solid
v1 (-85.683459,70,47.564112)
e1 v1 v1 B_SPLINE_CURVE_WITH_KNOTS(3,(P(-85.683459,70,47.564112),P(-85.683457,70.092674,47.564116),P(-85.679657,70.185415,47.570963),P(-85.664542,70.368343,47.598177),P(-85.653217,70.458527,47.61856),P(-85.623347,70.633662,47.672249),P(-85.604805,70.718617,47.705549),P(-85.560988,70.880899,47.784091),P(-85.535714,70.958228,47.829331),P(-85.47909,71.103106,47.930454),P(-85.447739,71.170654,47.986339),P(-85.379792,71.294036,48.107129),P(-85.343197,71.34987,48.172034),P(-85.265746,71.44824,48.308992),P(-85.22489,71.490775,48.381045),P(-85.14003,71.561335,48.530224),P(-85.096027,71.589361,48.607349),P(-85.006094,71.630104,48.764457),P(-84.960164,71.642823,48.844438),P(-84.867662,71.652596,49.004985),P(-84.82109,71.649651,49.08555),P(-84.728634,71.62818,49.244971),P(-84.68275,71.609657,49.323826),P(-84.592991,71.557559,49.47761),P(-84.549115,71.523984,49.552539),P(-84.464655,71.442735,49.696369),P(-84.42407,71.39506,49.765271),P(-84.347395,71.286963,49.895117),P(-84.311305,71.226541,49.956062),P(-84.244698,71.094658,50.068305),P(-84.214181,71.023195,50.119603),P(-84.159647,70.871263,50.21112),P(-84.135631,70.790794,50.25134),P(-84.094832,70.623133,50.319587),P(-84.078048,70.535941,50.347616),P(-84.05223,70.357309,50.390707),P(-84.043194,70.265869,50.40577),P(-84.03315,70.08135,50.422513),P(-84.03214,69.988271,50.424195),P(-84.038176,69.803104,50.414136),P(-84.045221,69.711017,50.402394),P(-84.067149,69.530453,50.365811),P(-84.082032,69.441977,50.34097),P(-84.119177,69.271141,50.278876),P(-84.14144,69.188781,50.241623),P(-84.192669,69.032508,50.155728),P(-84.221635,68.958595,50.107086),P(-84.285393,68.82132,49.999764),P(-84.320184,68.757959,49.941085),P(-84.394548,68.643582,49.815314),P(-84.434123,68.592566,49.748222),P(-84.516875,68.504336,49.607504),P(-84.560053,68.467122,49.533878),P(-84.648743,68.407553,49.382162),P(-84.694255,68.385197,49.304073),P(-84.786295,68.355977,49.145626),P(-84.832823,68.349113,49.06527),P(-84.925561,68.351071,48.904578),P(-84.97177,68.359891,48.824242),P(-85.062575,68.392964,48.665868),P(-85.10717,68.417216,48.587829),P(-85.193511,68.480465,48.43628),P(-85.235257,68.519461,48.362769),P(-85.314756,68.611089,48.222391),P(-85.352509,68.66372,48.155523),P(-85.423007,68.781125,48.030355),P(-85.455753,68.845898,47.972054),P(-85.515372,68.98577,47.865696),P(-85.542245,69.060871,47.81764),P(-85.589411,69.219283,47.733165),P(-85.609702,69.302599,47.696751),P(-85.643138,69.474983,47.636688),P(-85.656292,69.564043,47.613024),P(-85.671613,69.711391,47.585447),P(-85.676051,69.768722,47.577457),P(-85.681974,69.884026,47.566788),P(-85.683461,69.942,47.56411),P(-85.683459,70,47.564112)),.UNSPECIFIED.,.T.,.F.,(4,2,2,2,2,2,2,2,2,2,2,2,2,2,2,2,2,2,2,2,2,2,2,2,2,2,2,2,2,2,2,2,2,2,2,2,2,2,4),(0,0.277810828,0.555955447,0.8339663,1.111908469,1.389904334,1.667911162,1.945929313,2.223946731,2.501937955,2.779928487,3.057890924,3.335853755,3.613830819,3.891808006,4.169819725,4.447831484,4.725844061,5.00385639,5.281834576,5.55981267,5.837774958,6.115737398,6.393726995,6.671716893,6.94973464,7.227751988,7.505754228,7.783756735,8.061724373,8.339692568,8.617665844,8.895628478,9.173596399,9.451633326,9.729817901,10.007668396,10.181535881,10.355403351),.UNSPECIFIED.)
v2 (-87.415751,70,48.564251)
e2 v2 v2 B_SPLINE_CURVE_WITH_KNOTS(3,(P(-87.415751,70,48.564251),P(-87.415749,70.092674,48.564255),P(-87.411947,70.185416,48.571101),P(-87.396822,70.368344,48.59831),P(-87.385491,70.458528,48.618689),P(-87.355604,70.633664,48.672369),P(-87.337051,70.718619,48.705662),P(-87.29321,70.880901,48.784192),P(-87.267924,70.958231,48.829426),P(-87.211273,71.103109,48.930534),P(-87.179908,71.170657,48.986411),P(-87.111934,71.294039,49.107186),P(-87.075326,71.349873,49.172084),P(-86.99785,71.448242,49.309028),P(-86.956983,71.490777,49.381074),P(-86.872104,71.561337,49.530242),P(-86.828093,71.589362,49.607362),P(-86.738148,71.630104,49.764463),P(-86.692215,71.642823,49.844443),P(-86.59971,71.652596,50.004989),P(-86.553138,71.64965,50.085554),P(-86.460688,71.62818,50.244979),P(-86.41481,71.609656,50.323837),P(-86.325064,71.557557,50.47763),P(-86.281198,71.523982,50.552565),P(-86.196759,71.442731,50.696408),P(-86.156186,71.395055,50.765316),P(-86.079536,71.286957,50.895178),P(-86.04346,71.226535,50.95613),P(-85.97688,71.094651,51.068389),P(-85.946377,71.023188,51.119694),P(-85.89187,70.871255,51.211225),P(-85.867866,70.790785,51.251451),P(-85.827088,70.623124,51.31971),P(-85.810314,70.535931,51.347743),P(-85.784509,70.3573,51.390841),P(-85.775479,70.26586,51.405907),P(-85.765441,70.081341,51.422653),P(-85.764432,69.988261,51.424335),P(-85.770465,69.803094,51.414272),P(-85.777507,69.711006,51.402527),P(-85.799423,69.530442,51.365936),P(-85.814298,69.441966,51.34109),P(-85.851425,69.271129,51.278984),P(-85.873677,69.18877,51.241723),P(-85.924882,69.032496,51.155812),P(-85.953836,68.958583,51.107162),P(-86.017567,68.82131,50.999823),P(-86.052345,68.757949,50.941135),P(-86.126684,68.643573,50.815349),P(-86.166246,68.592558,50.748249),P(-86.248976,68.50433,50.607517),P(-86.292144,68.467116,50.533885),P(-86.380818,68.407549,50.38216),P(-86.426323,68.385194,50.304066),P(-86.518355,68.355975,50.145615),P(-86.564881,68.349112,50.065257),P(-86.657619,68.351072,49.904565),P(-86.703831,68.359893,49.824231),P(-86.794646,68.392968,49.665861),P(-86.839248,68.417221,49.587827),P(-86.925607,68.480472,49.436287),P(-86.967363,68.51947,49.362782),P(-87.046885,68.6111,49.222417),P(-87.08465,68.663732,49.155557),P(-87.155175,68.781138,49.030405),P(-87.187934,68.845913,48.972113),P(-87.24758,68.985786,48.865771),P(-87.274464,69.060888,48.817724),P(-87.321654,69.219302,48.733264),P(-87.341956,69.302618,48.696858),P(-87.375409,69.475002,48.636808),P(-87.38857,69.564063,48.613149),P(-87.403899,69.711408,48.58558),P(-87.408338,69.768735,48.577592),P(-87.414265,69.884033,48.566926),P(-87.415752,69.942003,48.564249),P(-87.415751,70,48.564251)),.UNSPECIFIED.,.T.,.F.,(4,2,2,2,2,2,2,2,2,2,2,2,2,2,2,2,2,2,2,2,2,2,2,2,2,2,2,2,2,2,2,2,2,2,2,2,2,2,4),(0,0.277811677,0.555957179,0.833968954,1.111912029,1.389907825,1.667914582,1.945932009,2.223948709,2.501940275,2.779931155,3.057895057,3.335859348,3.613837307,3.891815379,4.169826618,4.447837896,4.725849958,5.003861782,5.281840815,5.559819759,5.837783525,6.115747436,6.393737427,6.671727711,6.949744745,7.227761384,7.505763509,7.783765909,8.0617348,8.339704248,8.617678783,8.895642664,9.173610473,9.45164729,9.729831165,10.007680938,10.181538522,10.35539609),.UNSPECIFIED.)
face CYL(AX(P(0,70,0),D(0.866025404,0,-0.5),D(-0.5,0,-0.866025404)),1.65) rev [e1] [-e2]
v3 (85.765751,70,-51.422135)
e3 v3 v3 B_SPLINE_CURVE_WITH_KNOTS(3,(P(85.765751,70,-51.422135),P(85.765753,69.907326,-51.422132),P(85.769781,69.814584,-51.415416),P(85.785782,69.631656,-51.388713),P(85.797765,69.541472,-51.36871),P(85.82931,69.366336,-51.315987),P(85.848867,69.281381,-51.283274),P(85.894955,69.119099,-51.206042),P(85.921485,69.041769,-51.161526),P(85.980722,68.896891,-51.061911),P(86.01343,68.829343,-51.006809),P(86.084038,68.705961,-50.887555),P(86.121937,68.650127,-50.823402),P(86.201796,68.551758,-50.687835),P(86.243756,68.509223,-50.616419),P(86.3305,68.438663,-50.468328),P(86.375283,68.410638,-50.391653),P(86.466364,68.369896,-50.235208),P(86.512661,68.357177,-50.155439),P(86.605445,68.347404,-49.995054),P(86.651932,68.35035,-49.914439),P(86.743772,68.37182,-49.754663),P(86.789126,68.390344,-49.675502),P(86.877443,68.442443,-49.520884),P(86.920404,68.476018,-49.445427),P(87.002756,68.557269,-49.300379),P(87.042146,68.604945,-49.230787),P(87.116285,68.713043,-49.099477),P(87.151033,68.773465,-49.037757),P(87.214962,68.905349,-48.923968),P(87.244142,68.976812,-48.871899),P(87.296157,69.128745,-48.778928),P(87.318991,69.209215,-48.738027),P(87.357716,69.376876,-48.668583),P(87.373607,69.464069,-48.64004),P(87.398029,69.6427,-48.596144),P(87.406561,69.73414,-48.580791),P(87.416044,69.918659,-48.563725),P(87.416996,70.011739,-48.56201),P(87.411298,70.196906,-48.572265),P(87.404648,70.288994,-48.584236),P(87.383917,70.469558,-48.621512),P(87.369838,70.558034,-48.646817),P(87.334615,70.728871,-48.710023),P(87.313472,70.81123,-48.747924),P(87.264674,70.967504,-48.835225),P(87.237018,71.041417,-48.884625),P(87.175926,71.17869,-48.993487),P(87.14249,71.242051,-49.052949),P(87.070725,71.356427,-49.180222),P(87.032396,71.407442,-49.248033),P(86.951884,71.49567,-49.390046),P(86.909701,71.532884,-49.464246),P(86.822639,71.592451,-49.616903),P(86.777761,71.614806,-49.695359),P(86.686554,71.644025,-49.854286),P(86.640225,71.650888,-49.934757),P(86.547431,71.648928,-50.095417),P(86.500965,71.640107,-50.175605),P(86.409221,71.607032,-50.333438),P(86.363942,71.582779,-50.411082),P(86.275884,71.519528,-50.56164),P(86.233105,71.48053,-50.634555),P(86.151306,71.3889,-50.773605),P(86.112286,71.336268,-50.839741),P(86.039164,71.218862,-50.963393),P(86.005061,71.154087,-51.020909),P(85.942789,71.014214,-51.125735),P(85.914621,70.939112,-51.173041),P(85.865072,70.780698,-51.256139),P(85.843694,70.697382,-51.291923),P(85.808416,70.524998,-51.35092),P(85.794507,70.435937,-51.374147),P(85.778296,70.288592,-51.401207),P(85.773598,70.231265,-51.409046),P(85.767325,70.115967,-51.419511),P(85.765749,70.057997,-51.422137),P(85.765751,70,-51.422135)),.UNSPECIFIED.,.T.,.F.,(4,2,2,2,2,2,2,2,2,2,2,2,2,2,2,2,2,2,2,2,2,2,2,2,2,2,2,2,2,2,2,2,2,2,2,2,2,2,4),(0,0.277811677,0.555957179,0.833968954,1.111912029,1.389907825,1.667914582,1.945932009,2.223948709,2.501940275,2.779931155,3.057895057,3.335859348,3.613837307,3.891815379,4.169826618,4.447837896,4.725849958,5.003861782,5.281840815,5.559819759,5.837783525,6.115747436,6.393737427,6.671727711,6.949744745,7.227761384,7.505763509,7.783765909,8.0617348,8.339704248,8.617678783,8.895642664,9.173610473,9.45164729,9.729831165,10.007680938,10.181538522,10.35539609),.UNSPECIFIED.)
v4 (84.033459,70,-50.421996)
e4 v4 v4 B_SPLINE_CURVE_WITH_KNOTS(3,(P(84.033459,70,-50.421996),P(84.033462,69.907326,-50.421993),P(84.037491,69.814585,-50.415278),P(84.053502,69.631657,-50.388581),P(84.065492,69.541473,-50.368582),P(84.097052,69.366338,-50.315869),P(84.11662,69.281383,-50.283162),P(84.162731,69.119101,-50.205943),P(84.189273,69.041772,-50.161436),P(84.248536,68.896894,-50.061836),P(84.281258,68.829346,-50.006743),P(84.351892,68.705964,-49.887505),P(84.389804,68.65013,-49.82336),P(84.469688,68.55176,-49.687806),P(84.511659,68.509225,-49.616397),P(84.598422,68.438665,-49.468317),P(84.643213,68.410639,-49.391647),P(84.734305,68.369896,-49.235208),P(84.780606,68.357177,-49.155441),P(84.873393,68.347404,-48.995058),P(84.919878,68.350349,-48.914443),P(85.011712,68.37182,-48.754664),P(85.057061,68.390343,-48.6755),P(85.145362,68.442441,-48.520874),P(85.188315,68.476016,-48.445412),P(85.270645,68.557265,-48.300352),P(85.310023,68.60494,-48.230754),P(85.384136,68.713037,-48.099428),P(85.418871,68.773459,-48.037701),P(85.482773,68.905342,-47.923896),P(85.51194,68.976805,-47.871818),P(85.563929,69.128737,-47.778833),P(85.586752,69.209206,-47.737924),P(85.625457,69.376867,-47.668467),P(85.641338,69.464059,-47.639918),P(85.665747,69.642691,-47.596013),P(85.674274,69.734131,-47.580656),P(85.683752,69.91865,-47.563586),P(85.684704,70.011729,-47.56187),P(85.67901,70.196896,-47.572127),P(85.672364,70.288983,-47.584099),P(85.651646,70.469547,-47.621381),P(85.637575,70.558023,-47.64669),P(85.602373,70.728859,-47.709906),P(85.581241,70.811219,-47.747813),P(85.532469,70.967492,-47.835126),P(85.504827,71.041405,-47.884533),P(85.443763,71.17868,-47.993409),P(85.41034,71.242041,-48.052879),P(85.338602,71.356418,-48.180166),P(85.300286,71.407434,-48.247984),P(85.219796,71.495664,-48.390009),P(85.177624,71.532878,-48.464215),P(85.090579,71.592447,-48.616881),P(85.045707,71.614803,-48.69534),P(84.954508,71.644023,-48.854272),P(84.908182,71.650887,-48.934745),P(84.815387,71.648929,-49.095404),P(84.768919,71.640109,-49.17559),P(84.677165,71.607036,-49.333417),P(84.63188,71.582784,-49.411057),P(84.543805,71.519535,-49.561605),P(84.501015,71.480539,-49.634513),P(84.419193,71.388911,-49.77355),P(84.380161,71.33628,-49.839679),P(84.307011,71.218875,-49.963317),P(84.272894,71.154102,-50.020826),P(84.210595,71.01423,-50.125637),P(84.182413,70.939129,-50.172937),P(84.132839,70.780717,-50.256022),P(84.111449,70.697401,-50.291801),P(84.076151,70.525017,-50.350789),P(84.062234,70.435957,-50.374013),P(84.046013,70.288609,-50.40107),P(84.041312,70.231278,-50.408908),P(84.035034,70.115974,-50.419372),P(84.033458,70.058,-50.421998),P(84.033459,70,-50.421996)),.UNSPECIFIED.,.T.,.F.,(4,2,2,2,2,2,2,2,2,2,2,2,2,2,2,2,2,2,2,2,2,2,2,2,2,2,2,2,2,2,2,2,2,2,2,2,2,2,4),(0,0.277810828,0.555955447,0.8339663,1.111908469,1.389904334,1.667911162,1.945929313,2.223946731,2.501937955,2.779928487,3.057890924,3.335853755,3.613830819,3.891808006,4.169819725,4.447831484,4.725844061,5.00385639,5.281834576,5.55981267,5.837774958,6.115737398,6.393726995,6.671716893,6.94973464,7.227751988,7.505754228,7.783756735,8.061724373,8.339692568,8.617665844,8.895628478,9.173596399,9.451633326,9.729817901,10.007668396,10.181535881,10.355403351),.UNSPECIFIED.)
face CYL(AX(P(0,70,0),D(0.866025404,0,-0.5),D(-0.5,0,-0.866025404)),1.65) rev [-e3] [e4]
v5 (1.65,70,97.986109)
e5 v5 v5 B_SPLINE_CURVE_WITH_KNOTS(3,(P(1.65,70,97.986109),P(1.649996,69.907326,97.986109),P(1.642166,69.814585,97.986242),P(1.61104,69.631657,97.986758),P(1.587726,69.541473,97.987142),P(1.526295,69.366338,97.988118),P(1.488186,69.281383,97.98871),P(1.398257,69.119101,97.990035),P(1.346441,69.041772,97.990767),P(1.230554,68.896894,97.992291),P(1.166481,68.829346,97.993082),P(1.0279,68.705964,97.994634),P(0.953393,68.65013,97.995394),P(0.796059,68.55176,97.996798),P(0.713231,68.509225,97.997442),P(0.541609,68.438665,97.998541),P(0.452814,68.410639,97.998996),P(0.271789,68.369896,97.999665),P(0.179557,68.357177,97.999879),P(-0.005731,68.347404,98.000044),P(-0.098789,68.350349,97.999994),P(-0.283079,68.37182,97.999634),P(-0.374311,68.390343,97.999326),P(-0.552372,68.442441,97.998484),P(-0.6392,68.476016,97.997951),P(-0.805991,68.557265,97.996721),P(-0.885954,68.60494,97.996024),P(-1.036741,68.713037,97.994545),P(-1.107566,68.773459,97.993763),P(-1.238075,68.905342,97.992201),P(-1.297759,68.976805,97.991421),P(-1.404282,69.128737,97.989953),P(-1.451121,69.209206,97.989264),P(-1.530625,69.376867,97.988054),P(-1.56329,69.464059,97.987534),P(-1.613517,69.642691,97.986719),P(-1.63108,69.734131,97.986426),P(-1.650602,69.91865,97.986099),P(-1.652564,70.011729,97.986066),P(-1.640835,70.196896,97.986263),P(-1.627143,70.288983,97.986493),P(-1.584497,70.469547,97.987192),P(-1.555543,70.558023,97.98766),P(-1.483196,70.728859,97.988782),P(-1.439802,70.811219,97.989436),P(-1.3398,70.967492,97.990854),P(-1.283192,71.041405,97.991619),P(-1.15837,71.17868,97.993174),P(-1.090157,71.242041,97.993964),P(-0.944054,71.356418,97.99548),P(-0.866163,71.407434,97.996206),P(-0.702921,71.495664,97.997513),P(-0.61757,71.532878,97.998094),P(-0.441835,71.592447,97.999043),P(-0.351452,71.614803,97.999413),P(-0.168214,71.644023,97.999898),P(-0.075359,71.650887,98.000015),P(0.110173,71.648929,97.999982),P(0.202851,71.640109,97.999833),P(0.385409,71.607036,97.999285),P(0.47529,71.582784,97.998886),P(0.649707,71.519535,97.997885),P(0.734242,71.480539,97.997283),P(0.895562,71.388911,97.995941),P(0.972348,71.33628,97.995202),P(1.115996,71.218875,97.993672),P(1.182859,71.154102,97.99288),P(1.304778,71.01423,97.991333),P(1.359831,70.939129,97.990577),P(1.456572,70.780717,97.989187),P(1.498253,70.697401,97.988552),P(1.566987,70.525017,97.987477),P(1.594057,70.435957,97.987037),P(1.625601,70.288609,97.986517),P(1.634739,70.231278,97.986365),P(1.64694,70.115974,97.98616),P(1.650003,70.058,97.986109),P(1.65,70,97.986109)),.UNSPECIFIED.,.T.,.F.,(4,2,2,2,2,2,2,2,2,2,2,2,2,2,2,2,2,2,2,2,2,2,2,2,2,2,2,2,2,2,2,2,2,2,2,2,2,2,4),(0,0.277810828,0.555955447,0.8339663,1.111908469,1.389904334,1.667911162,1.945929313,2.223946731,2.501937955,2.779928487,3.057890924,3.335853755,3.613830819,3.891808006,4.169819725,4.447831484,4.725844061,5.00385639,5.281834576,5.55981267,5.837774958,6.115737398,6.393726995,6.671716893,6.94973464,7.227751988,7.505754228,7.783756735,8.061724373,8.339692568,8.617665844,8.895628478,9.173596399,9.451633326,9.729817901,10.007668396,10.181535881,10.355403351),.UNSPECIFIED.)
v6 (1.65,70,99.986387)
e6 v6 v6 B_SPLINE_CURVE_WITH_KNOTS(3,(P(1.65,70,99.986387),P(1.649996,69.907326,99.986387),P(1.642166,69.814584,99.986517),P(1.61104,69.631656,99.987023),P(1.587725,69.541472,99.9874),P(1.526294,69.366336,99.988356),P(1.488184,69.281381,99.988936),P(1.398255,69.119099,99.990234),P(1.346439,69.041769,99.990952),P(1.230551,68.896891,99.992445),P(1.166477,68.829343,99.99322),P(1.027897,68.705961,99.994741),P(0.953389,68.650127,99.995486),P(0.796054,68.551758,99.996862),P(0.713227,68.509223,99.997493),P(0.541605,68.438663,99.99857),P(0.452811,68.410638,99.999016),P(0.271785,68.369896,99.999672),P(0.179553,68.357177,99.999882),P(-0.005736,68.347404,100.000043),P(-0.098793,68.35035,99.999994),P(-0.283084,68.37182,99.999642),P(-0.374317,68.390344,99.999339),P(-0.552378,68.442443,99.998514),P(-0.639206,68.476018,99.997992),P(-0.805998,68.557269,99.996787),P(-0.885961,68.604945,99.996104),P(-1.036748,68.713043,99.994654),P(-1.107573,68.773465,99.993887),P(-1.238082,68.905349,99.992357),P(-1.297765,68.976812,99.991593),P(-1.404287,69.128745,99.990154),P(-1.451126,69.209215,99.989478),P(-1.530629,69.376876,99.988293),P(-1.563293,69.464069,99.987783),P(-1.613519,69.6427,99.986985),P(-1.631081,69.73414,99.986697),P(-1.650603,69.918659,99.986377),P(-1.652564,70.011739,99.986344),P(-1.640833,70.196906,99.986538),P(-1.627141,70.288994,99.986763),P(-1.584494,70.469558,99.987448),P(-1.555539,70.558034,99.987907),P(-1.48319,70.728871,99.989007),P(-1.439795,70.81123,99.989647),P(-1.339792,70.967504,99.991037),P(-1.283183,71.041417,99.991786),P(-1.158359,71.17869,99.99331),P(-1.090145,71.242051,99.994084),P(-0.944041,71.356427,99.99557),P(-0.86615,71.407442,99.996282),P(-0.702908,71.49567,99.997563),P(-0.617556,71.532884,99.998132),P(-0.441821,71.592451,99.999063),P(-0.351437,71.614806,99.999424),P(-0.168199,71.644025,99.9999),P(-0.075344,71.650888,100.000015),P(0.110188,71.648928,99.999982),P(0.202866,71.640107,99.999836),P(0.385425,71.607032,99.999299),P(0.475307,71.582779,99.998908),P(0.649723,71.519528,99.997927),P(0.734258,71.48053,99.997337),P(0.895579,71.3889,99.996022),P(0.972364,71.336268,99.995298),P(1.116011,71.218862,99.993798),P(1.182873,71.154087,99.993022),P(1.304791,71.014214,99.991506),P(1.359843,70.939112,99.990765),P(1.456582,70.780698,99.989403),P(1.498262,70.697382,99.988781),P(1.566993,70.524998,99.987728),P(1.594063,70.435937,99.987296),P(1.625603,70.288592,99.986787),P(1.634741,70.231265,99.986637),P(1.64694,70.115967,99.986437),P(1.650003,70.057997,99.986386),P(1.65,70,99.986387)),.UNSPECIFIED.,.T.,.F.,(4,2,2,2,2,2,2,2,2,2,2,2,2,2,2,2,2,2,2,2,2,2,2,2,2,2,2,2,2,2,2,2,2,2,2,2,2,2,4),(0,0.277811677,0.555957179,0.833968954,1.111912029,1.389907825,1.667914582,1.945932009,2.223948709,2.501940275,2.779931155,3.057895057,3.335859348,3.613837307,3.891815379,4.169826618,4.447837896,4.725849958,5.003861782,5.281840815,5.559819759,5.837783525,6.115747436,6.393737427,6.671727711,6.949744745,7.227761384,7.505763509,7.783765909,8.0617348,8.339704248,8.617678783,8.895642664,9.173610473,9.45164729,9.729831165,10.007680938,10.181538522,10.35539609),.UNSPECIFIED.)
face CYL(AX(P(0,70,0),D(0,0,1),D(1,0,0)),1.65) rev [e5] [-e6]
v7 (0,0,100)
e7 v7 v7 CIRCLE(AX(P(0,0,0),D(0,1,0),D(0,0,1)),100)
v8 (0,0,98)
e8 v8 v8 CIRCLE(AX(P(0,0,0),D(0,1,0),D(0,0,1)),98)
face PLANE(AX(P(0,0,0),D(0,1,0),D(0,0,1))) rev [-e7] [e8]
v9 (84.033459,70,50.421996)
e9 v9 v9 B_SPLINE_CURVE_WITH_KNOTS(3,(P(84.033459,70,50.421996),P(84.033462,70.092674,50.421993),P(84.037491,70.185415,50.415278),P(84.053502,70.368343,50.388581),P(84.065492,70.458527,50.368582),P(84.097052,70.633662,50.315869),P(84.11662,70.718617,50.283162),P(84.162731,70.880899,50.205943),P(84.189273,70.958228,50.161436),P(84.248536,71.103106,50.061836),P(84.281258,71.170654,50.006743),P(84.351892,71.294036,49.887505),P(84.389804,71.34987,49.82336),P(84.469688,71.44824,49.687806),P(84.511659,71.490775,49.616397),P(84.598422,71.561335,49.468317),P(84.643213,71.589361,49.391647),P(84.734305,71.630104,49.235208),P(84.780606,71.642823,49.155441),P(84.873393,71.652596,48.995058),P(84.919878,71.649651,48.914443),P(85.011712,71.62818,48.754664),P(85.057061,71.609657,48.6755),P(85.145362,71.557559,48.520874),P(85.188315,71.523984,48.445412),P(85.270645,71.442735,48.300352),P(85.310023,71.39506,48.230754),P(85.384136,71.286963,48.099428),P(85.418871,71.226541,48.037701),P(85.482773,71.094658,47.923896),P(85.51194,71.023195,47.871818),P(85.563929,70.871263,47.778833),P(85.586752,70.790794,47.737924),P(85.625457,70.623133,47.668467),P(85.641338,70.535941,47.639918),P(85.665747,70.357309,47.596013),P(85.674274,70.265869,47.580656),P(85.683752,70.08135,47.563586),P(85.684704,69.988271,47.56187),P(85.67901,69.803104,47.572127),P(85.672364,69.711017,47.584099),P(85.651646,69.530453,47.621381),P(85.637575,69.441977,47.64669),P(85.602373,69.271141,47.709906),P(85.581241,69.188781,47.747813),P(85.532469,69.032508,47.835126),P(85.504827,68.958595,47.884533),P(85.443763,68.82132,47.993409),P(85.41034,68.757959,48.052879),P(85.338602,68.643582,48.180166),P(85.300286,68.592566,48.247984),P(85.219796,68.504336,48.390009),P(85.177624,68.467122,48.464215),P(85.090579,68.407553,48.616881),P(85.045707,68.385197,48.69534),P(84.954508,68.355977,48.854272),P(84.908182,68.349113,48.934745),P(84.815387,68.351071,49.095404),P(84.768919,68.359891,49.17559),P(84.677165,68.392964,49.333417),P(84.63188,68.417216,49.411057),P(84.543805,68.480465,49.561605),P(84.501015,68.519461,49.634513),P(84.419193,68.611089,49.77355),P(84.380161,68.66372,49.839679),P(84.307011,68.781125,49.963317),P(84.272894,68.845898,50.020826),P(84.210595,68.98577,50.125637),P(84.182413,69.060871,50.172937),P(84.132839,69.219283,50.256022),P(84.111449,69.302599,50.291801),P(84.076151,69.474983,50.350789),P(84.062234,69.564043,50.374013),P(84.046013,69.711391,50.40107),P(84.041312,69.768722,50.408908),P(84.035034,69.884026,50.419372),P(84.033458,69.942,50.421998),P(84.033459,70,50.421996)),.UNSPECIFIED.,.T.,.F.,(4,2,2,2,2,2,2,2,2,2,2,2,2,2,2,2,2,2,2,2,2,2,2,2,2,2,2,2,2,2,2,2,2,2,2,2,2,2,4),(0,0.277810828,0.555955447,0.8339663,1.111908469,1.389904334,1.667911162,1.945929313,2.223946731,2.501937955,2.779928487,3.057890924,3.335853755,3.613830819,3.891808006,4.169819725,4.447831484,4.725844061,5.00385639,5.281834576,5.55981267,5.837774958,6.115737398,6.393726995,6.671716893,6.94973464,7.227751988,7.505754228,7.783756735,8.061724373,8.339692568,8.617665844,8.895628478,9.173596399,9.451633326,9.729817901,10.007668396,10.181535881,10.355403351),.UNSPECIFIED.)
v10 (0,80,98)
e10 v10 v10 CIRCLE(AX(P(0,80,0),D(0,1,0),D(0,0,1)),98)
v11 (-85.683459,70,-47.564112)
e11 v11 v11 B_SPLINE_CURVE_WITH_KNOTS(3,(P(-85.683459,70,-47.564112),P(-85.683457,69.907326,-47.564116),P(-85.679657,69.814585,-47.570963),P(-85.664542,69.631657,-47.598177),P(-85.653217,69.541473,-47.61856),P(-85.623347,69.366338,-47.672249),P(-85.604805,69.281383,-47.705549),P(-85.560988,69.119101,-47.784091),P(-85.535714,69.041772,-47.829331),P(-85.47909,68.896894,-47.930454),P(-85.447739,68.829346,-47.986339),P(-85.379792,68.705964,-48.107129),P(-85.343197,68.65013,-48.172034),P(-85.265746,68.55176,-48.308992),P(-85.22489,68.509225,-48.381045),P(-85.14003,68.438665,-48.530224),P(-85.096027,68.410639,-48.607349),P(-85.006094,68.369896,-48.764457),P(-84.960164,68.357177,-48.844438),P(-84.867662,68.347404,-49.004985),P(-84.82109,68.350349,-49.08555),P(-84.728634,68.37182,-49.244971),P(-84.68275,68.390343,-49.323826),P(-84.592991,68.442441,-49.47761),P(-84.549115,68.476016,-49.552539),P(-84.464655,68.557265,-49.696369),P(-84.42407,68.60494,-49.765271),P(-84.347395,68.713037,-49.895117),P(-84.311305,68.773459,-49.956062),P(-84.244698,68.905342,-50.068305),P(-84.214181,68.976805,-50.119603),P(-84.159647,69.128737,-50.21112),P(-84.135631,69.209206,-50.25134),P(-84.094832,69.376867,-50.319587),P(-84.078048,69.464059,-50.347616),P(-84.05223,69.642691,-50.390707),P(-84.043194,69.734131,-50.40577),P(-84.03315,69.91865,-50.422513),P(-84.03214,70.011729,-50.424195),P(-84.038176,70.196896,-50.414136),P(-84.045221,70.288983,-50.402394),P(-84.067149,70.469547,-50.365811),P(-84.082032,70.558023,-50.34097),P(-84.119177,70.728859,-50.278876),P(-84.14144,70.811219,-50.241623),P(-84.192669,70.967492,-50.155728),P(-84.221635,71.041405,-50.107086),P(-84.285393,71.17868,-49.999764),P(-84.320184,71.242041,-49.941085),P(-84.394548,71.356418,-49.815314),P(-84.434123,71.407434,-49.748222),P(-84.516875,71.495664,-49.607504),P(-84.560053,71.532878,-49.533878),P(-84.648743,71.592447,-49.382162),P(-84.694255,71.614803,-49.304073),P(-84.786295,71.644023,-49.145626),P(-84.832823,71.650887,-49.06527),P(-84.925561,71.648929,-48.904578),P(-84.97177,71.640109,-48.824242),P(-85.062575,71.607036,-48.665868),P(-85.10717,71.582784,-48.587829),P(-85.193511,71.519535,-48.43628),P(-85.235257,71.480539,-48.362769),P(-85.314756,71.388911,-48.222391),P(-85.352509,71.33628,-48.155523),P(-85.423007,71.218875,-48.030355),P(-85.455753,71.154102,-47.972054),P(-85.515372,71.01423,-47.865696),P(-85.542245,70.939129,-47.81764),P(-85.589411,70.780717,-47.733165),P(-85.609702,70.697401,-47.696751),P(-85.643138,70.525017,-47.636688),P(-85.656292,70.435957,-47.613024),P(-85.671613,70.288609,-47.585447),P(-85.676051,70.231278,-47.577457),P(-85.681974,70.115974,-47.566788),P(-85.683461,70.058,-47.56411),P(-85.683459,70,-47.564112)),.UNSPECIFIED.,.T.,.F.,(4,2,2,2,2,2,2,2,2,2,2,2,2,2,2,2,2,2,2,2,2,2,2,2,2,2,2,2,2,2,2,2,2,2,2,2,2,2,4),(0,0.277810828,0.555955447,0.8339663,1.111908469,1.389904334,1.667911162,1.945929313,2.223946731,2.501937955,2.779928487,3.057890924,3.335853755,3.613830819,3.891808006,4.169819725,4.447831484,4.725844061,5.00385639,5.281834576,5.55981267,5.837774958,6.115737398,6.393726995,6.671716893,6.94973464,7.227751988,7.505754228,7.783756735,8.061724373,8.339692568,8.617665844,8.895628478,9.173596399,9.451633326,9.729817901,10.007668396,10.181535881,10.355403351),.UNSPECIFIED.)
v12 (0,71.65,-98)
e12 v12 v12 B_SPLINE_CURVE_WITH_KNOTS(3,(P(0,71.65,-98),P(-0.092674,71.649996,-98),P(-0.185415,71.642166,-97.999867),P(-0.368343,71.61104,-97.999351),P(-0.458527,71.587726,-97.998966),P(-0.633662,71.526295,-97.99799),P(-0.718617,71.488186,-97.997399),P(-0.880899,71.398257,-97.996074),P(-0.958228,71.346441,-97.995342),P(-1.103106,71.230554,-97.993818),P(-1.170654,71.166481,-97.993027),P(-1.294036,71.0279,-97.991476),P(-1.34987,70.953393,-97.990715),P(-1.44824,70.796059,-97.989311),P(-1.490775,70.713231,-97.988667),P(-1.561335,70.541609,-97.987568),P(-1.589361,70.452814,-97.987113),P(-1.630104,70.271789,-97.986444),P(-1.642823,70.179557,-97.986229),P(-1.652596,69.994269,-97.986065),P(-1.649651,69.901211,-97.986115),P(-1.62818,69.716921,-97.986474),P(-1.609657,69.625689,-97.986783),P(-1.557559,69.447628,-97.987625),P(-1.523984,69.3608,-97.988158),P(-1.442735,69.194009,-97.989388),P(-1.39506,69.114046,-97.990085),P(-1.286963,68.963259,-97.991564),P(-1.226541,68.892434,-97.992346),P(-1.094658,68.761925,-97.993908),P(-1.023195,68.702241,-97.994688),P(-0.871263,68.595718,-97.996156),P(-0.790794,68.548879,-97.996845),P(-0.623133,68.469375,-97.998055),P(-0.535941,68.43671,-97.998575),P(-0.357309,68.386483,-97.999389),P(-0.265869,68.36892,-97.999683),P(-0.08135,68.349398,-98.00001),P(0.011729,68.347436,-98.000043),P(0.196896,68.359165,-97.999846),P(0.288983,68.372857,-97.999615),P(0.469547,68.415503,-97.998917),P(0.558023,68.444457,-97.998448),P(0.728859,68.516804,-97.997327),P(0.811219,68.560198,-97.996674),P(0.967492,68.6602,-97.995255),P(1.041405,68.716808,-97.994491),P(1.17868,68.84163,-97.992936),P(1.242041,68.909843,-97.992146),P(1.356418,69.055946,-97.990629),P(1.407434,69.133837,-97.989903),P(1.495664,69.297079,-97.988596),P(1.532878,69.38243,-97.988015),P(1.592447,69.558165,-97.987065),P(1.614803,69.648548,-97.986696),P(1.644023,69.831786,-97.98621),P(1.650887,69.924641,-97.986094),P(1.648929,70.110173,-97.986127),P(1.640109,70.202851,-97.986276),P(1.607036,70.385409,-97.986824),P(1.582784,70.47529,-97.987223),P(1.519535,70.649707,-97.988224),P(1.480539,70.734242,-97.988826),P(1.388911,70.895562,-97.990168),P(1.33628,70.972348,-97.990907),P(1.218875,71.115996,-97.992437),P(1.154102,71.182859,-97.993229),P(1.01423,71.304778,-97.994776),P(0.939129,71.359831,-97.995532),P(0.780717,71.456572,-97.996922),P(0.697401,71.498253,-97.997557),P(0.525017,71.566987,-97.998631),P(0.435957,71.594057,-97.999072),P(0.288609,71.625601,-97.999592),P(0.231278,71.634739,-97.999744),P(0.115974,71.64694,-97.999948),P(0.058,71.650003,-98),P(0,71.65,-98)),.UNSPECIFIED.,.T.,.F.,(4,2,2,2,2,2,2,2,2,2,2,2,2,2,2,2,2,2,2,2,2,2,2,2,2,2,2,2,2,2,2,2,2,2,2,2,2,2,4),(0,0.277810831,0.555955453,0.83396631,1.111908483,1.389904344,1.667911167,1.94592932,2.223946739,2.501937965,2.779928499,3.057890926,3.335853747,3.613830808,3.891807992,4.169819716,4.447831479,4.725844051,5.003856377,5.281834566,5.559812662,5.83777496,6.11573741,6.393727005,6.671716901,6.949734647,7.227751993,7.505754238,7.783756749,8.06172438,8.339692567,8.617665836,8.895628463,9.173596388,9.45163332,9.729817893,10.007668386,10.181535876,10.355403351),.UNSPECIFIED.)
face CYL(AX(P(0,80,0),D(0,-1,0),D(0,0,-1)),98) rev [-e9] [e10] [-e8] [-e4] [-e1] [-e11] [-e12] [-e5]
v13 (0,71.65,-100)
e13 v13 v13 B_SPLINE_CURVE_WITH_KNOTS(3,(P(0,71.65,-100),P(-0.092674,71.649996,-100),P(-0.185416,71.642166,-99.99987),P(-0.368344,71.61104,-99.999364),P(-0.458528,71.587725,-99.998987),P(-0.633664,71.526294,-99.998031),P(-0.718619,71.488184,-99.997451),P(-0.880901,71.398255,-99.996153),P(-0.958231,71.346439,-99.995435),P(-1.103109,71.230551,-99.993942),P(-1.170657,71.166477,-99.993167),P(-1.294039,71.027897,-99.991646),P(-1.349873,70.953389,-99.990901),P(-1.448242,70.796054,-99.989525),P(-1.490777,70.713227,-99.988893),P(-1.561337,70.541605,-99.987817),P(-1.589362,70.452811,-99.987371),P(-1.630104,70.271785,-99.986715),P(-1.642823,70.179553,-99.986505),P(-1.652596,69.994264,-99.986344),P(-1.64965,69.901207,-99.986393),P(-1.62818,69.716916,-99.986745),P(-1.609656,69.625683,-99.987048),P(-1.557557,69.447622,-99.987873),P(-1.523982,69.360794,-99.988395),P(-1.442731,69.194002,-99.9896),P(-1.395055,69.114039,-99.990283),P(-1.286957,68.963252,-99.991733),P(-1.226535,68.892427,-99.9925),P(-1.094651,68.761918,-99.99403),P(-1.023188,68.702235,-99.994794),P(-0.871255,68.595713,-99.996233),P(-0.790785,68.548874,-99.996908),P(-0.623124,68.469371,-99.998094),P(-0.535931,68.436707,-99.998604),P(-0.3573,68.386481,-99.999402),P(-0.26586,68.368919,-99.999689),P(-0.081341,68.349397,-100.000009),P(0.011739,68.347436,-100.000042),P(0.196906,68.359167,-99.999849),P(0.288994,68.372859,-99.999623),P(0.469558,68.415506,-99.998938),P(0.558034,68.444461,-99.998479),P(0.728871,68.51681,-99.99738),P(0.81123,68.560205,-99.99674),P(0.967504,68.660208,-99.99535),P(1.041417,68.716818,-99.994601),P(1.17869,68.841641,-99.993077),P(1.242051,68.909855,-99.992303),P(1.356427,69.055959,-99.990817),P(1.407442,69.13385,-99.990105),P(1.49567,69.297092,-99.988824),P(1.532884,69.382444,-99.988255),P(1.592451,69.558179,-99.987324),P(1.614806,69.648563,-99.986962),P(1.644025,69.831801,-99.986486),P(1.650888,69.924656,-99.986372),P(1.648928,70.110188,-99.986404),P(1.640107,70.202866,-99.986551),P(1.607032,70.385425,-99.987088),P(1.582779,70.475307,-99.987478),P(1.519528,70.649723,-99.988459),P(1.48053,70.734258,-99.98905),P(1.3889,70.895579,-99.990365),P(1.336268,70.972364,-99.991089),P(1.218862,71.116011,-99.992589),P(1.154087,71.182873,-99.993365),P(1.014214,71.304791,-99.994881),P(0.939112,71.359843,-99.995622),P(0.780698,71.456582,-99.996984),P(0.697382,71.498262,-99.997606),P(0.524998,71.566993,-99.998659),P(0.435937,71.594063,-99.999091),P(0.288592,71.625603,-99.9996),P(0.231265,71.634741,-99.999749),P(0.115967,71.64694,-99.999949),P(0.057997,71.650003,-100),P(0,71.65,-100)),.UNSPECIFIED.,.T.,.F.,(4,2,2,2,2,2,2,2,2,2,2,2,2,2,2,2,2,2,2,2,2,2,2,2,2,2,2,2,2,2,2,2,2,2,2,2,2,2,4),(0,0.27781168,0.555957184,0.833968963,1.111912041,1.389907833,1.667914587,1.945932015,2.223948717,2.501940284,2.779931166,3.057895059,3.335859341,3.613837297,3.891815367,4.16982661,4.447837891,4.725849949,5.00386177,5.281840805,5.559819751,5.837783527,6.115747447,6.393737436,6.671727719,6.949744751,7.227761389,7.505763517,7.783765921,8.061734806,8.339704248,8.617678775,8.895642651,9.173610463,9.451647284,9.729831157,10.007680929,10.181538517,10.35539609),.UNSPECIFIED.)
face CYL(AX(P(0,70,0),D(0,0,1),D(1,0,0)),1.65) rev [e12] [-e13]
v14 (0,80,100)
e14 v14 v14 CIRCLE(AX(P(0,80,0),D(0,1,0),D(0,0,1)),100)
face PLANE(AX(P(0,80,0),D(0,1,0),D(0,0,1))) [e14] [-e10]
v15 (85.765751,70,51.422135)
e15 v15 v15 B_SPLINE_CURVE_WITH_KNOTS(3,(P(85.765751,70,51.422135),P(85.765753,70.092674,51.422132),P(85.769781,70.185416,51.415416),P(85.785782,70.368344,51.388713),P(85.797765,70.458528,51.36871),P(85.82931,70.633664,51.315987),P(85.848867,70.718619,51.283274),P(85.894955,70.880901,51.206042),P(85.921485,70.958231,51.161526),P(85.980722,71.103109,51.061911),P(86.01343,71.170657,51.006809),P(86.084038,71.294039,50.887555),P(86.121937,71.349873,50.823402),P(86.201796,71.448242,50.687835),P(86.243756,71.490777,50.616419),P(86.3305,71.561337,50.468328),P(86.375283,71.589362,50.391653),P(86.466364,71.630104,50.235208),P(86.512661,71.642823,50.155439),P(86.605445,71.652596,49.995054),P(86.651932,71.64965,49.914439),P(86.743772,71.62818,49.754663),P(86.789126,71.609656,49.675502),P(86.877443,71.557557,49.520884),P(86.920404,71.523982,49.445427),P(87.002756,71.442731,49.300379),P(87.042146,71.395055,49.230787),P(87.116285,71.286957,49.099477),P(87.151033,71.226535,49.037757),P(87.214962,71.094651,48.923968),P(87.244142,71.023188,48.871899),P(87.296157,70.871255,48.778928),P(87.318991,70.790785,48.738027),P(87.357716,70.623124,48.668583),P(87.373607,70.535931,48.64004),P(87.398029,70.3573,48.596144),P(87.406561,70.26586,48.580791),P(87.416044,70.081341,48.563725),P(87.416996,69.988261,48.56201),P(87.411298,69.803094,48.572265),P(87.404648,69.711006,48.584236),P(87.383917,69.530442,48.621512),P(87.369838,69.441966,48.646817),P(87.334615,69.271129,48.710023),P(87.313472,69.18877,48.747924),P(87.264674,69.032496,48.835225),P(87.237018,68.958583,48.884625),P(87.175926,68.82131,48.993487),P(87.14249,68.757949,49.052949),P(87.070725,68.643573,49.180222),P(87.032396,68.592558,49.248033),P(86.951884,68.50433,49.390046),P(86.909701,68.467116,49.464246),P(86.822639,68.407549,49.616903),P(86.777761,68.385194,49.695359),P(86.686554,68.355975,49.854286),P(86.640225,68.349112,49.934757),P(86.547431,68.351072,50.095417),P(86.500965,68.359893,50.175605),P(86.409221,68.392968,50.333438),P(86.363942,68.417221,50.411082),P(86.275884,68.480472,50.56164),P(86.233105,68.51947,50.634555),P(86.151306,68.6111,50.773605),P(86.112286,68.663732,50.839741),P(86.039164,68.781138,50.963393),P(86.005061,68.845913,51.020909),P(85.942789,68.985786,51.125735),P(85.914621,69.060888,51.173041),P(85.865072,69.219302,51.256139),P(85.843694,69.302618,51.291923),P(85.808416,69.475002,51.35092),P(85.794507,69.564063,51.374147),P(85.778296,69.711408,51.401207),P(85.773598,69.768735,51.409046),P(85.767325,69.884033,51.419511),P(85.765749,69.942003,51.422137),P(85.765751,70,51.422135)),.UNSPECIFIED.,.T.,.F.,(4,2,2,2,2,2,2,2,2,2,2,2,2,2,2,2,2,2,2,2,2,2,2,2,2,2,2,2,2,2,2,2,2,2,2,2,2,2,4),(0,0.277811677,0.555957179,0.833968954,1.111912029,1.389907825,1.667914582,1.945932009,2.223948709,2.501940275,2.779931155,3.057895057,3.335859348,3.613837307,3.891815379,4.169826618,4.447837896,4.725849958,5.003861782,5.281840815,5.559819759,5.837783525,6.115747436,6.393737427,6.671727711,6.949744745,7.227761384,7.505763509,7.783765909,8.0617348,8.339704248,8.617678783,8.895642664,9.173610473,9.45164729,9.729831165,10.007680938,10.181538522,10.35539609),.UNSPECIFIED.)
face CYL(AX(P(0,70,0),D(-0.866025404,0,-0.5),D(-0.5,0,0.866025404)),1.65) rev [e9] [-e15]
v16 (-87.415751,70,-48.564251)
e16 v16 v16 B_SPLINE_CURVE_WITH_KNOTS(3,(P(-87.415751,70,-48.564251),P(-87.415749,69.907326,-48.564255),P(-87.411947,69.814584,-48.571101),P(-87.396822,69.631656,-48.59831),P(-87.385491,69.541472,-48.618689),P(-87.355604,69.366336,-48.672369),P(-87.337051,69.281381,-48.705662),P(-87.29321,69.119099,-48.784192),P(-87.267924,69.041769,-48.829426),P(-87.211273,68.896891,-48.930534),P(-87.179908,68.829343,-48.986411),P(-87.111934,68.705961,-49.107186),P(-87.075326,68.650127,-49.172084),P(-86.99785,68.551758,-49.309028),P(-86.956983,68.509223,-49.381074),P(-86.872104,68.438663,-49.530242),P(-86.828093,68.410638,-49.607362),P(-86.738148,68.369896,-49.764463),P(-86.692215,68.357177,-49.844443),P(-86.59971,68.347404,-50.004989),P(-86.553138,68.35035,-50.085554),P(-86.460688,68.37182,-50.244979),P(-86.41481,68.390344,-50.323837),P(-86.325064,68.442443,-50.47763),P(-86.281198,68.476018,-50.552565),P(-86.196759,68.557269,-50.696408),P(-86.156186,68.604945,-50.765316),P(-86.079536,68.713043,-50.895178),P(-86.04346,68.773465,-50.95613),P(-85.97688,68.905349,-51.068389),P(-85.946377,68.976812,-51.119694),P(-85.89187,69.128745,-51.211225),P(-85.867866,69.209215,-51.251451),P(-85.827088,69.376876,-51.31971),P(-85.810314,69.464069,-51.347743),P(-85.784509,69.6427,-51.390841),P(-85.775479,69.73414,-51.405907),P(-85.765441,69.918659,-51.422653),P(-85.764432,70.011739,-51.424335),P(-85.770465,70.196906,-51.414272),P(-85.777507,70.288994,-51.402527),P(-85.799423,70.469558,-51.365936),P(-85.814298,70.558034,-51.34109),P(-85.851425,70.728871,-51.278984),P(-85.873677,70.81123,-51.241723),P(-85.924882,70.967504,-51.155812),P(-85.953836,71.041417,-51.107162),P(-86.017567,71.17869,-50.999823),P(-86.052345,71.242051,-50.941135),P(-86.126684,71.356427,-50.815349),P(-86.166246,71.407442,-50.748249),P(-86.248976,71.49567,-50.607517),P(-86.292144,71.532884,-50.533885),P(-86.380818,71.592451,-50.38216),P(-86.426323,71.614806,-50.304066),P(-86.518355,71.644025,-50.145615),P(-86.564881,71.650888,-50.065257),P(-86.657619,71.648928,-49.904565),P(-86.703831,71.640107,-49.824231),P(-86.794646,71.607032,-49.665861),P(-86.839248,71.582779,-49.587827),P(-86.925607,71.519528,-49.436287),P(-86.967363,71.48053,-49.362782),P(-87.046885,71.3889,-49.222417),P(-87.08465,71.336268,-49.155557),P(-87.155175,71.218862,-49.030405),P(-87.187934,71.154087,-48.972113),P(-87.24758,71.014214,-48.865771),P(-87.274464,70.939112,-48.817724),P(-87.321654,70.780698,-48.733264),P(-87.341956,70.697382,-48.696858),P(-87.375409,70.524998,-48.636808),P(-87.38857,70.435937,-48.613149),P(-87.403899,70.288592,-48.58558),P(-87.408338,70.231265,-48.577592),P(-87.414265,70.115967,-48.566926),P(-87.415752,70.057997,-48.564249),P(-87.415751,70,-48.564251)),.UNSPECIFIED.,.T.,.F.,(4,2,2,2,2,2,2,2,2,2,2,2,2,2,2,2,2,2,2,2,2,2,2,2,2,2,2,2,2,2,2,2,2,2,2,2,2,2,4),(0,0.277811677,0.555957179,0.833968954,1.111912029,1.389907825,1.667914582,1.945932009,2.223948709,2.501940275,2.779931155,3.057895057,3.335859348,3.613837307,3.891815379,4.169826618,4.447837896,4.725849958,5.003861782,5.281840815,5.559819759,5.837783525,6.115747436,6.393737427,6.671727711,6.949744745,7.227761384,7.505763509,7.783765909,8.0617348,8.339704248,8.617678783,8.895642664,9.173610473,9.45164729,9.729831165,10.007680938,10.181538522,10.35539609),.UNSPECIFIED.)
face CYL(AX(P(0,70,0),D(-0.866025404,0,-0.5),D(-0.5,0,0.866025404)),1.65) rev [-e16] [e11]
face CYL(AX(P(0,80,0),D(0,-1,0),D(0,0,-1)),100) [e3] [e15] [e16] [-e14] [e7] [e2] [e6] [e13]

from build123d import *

# Parameters (mm, degrees)
SKETCH1_R           = 100
SKETCH1_R_2         = 98
BOSS_EXTRUDE1_DEPTH = 80
F_3DSKETCH1_R       = 1.65
CUT_EXTRUDE1_DEPTH  = 158.797338381
CIRPATTERN1_COUNT   = 3


with BuildPart() as part:
    # Sketch1 → Boss-Extrude1 (new body)
    with BuildSketch(Plane(origin=(0, 0, 0), x_dir=(1, 0, 0), z_dir=(0, 1, 0))):
        Circle(SKETCH1_R)
        Circle(SKETCH1_R_2, mode=Mode.SUBTRACT)
    extrude(amount=BOSS_EXTRUDE1_DEPTH)

    # 3DSketch1 → Cut-Extrude1 (cut, symmetric)
    with BuildSketch(Plane(origin=(0, 70, 0), x_dir=(1, 0, 0), z_dir=(0, 0, 1))):
        Circle(F_3DSKETCH1_R)
    cut_extrude1 = extrude(amount=CUT_EXTRUDE1_DEPTH, both=True, mode=Mode.SUBTRACT)

    # CirPattern1: Cut-Extrude1 ×3 about axis
    cirpattern1_axis = Axis((0, 80, 0), (0, -1, 0))
    for i in range(1, CIRPATTERN1_COUNT):
        add(cut_extrude1.rotate(cirpattern1_axis, i * 360 / CIRPATTERN1_COUNT), mode=Mode.SUBTRACT)


solid = part.part
